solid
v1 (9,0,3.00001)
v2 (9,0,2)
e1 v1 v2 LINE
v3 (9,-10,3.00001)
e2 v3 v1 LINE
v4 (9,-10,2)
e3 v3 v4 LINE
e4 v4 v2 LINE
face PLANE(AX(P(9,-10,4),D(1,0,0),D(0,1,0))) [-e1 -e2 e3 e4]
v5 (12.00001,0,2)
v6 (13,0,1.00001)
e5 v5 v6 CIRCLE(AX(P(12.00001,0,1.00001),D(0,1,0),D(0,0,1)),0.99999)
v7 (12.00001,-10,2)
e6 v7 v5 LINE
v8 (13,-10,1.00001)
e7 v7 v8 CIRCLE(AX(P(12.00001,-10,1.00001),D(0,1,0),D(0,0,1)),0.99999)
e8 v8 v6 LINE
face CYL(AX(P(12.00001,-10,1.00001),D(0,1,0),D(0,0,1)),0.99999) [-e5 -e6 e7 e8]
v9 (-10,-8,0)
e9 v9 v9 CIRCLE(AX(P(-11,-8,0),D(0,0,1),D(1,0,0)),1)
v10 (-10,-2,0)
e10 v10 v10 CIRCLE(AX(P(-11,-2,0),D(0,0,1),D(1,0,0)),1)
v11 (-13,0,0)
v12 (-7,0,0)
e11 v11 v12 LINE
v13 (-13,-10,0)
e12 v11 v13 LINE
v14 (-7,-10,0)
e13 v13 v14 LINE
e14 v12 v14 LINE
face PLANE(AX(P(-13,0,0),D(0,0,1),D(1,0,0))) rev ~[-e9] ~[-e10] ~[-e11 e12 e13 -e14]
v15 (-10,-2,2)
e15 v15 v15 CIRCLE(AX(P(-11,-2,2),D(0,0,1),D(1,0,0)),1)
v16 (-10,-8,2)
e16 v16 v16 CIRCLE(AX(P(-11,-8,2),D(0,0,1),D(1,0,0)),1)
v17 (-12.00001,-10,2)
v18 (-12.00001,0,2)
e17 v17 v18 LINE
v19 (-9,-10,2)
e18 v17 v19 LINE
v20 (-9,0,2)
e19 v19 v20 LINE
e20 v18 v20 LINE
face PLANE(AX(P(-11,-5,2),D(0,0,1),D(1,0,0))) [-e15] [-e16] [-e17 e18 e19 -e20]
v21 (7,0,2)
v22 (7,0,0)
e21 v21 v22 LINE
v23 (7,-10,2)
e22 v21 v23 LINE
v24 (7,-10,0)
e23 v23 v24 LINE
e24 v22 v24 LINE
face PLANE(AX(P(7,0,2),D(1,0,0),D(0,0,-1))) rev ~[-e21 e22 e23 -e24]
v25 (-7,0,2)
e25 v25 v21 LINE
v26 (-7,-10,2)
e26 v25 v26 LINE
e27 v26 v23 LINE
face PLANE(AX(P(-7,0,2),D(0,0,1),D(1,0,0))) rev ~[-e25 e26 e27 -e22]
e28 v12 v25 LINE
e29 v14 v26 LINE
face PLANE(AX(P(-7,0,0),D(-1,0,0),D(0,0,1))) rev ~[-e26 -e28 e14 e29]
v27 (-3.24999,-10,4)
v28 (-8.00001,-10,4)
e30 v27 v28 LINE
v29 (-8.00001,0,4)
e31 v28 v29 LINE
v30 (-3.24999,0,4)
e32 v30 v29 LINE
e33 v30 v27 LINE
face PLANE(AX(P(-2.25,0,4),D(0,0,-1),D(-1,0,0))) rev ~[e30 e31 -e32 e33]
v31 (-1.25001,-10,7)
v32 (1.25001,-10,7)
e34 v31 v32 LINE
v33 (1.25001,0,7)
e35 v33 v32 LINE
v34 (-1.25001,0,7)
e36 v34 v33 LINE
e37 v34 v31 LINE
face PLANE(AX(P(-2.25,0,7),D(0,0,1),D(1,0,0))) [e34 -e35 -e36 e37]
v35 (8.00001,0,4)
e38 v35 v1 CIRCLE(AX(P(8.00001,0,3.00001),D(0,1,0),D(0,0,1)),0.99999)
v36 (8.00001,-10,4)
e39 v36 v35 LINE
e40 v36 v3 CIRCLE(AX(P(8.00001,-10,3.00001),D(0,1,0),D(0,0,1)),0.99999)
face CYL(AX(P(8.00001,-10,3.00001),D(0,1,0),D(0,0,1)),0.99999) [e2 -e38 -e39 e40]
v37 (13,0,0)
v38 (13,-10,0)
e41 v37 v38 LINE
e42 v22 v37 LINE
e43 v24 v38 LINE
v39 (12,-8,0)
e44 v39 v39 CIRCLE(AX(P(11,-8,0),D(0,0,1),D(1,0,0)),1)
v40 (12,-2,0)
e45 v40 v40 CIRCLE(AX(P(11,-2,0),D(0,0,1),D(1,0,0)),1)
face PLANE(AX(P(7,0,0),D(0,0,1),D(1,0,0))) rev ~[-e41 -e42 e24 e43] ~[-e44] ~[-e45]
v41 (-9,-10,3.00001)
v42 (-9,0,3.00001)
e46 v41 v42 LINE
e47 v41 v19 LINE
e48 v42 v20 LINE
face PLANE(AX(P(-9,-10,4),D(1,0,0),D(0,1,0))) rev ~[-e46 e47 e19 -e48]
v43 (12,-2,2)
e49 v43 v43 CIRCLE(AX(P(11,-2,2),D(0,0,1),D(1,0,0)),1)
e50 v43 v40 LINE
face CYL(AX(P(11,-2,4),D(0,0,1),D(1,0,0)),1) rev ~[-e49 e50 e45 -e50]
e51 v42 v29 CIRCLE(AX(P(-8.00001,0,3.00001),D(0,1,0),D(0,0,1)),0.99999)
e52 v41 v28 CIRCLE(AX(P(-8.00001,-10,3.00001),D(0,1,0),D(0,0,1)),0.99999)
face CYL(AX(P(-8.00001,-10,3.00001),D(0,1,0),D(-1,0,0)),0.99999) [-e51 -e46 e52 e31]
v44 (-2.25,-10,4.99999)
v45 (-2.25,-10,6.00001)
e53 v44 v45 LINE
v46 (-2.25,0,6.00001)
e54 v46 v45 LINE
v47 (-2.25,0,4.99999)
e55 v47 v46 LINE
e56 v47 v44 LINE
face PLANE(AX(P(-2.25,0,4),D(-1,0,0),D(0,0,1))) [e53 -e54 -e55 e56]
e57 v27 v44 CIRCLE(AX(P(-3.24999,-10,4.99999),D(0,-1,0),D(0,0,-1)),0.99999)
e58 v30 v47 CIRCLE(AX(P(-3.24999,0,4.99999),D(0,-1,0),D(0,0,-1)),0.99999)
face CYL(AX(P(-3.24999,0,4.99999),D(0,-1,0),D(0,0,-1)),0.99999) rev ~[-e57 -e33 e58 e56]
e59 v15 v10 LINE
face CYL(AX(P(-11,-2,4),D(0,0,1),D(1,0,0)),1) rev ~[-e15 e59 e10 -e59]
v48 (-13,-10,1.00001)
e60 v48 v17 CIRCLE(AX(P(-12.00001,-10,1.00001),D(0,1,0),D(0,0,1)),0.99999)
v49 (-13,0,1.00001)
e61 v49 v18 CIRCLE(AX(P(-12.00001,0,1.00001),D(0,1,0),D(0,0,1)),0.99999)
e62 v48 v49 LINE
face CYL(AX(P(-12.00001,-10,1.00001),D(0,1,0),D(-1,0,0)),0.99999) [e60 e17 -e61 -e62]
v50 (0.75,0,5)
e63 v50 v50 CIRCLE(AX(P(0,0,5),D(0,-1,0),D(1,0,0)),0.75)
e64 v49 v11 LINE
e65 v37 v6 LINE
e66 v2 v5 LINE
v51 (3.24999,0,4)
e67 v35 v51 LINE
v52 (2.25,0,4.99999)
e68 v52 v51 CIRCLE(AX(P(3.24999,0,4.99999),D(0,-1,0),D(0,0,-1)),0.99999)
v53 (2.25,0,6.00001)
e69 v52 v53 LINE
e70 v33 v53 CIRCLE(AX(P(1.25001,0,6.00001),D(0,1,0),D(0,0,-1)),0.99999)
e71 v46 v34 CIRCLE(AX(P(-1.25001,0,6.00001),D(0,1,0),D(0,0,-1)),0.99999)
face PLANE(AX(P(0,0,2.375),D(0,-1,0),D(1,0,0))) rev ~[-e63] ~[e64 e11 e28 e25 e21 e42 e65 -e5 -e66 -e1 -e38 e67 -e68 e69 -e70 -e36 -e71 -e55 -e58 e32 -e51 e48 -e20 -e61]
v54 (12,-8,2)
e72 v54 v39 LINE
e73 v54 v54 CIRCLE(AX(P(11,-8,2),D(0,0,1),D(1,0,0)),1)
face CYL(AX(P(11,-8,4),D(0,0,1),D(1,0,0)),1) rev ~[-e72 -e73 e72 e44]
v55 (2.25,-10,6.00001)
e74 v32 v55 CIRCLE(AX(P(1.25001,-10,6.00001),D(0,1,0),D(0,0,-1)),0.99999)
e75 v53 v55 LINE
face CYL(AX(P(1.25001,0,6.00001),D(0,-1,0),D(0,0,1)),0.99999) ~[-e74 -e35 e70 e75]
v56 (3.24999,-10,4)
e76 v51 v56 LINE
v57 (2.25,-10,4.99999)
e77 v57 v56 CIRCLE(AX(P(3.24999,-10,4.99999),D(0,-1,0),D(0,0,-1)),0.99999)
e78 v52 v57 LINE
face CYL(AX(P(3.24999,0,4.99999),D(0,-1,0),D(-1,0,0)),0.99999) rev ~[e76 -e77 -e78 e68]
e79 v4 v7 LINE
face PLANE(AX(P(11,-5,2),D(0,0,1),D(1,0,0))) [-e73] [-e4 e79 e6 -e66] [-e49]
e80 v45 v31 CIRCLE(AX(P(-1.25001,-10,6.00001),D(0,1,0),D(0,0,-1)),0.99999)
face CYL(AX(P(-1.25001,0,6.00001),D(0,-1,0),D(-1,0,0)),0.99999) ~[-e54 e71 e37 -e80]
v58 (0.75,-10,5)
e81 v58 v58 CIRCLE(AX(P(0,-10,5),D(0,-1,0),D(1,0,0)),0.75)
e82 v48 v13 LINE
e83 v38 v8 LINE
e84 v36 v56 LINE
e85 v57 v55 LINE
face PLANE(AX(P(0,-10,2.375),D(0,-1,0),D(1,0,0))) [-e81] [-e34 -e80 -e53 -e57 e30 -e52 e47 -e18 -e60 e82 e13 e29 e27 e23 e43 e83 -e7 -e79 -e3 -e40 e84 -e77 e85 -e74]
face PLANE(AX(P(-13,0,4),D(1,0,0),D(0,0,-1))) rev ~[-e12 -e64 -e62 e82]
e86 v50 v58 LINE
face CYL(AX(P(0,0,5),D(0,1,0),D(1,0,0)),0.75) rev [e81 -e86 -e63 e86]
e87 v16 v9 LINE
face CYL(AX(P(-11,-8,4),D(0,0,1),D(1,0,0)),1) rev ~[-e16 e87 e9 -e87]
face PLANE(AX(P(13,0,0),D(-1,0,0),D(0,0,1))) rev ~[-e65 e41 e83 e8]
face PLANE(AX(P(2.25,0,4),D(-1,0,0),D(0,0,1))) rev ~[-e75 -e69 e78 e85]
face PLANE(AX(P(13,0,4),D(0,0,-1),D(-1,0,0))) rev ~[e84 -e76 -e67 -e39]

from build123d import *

# Parameters (mm, degrees)
F0_W     = 4.5
F0_H     = 3
F0_R     = 0.75
F1_DEPTH = 10
F2_R     = 1
F3_DEPTH = 4
F4_R     = 1
F5_DEPTH = 4
F6_W     = 4
F6_H     = 10
F6_R     = 1
F7_DEPTH = 2
F8_W     = 4
F8_H     = 10
F8_R     = 1
F9_DEPTH = 2
F10_R    = 0.99999


# Not quite as in the source:
# - a fillet or chamfer is up to 0.001 mm smaller than in the source, because OpenCascade refuses the exact size


with BuildPart() as f1:
    # F0 (on Front) → F1 (new body)
    with BuildSketch(Plane.XZ):
        Polygon((-13, 4), (-13, 0), (-7, 0), (-7, 2), (7, 2), (7, 0), (13, 0), (13, 4), (2.25, 4), (-2.25, 4), align=None)
        with Locations((0, 5.5)):
            Rectangle(F0_W, F0_H)
        with Locations((0, 5)):
            Circle(F0_R, mode=Mode.SUBTRACT)
    extrude(amount=F1_DEPTH)

    # F2 (on face) → F3 (cut)
    with BuildSketch(Plane.XY.offset(4)):
        with Locations((-11, -2)):
            Circle(F2_R)
        with Locations((-11, -8)):
            Circle(F2_R)
    extrude(amount=-F3_DEPTH, mode=Mode.SUBTRACT)

    # F4 (on face) → F5 (cut)
    with BuildSketch(Plane.XY.offset(4)):
        with Locations((11, -2)):
            Circle(F4_R)
        with Locations((11, -8)):
            Circle(F4_R)
    extrude(amount=-F5_DEPTH, mode=Mode.SUBTRACT)

    # F6 (on face) → F7 (cut)
    with BuildSketch(Plane.XY.offset(4)):
        with Locations((-11, -5)):
            Rectangle(F6_W, F6_H)
        with Locations((-11, -8)):
            Circle(F6_R, mode=Mode.SUBTRACT)
        with Locations((-11, -2)):
            Circle(F6_R, mode=Mode.SUBTRACT)
    extrude(amount=-F7_DEPTH, mode=Mode.SUBTRACT)

    # F8 (on face) → F9 (cut)
    with BuildSketch(Plane.XY.offset(4)):
        with Locations((11, -5)):
            Rectangle(F8_W, F8_H)
        with Locations((11, -8)):
            Circle(F8_R, mode=Mode.SUBTRACT)
        with Locations((11, -2)):
            Circle(F8_R, mode=Mode.SUBTRACT)
    extrude(amount=-F9_DEPTH, mode=Mode.SUBTRACT)

    # F10 (radius 1 in the source; OpenCascade refuses exactly that, so slightly less here)
    f10_edges = [f1.edges().sort_by_distance(p)[0] for p in [
        (-9, -5, 4),
        (-2.25, -5, 7),
        (-2.25, -5, 4),
        (2.25, -5, 7),
        (2.25, -5, 4),
        (9, -5, 4),
        (-13, -5, 2),
        (13, -5, 2),
    ]]
    fillet(f10_edges, radius=F10_R)


solid = f1.part
